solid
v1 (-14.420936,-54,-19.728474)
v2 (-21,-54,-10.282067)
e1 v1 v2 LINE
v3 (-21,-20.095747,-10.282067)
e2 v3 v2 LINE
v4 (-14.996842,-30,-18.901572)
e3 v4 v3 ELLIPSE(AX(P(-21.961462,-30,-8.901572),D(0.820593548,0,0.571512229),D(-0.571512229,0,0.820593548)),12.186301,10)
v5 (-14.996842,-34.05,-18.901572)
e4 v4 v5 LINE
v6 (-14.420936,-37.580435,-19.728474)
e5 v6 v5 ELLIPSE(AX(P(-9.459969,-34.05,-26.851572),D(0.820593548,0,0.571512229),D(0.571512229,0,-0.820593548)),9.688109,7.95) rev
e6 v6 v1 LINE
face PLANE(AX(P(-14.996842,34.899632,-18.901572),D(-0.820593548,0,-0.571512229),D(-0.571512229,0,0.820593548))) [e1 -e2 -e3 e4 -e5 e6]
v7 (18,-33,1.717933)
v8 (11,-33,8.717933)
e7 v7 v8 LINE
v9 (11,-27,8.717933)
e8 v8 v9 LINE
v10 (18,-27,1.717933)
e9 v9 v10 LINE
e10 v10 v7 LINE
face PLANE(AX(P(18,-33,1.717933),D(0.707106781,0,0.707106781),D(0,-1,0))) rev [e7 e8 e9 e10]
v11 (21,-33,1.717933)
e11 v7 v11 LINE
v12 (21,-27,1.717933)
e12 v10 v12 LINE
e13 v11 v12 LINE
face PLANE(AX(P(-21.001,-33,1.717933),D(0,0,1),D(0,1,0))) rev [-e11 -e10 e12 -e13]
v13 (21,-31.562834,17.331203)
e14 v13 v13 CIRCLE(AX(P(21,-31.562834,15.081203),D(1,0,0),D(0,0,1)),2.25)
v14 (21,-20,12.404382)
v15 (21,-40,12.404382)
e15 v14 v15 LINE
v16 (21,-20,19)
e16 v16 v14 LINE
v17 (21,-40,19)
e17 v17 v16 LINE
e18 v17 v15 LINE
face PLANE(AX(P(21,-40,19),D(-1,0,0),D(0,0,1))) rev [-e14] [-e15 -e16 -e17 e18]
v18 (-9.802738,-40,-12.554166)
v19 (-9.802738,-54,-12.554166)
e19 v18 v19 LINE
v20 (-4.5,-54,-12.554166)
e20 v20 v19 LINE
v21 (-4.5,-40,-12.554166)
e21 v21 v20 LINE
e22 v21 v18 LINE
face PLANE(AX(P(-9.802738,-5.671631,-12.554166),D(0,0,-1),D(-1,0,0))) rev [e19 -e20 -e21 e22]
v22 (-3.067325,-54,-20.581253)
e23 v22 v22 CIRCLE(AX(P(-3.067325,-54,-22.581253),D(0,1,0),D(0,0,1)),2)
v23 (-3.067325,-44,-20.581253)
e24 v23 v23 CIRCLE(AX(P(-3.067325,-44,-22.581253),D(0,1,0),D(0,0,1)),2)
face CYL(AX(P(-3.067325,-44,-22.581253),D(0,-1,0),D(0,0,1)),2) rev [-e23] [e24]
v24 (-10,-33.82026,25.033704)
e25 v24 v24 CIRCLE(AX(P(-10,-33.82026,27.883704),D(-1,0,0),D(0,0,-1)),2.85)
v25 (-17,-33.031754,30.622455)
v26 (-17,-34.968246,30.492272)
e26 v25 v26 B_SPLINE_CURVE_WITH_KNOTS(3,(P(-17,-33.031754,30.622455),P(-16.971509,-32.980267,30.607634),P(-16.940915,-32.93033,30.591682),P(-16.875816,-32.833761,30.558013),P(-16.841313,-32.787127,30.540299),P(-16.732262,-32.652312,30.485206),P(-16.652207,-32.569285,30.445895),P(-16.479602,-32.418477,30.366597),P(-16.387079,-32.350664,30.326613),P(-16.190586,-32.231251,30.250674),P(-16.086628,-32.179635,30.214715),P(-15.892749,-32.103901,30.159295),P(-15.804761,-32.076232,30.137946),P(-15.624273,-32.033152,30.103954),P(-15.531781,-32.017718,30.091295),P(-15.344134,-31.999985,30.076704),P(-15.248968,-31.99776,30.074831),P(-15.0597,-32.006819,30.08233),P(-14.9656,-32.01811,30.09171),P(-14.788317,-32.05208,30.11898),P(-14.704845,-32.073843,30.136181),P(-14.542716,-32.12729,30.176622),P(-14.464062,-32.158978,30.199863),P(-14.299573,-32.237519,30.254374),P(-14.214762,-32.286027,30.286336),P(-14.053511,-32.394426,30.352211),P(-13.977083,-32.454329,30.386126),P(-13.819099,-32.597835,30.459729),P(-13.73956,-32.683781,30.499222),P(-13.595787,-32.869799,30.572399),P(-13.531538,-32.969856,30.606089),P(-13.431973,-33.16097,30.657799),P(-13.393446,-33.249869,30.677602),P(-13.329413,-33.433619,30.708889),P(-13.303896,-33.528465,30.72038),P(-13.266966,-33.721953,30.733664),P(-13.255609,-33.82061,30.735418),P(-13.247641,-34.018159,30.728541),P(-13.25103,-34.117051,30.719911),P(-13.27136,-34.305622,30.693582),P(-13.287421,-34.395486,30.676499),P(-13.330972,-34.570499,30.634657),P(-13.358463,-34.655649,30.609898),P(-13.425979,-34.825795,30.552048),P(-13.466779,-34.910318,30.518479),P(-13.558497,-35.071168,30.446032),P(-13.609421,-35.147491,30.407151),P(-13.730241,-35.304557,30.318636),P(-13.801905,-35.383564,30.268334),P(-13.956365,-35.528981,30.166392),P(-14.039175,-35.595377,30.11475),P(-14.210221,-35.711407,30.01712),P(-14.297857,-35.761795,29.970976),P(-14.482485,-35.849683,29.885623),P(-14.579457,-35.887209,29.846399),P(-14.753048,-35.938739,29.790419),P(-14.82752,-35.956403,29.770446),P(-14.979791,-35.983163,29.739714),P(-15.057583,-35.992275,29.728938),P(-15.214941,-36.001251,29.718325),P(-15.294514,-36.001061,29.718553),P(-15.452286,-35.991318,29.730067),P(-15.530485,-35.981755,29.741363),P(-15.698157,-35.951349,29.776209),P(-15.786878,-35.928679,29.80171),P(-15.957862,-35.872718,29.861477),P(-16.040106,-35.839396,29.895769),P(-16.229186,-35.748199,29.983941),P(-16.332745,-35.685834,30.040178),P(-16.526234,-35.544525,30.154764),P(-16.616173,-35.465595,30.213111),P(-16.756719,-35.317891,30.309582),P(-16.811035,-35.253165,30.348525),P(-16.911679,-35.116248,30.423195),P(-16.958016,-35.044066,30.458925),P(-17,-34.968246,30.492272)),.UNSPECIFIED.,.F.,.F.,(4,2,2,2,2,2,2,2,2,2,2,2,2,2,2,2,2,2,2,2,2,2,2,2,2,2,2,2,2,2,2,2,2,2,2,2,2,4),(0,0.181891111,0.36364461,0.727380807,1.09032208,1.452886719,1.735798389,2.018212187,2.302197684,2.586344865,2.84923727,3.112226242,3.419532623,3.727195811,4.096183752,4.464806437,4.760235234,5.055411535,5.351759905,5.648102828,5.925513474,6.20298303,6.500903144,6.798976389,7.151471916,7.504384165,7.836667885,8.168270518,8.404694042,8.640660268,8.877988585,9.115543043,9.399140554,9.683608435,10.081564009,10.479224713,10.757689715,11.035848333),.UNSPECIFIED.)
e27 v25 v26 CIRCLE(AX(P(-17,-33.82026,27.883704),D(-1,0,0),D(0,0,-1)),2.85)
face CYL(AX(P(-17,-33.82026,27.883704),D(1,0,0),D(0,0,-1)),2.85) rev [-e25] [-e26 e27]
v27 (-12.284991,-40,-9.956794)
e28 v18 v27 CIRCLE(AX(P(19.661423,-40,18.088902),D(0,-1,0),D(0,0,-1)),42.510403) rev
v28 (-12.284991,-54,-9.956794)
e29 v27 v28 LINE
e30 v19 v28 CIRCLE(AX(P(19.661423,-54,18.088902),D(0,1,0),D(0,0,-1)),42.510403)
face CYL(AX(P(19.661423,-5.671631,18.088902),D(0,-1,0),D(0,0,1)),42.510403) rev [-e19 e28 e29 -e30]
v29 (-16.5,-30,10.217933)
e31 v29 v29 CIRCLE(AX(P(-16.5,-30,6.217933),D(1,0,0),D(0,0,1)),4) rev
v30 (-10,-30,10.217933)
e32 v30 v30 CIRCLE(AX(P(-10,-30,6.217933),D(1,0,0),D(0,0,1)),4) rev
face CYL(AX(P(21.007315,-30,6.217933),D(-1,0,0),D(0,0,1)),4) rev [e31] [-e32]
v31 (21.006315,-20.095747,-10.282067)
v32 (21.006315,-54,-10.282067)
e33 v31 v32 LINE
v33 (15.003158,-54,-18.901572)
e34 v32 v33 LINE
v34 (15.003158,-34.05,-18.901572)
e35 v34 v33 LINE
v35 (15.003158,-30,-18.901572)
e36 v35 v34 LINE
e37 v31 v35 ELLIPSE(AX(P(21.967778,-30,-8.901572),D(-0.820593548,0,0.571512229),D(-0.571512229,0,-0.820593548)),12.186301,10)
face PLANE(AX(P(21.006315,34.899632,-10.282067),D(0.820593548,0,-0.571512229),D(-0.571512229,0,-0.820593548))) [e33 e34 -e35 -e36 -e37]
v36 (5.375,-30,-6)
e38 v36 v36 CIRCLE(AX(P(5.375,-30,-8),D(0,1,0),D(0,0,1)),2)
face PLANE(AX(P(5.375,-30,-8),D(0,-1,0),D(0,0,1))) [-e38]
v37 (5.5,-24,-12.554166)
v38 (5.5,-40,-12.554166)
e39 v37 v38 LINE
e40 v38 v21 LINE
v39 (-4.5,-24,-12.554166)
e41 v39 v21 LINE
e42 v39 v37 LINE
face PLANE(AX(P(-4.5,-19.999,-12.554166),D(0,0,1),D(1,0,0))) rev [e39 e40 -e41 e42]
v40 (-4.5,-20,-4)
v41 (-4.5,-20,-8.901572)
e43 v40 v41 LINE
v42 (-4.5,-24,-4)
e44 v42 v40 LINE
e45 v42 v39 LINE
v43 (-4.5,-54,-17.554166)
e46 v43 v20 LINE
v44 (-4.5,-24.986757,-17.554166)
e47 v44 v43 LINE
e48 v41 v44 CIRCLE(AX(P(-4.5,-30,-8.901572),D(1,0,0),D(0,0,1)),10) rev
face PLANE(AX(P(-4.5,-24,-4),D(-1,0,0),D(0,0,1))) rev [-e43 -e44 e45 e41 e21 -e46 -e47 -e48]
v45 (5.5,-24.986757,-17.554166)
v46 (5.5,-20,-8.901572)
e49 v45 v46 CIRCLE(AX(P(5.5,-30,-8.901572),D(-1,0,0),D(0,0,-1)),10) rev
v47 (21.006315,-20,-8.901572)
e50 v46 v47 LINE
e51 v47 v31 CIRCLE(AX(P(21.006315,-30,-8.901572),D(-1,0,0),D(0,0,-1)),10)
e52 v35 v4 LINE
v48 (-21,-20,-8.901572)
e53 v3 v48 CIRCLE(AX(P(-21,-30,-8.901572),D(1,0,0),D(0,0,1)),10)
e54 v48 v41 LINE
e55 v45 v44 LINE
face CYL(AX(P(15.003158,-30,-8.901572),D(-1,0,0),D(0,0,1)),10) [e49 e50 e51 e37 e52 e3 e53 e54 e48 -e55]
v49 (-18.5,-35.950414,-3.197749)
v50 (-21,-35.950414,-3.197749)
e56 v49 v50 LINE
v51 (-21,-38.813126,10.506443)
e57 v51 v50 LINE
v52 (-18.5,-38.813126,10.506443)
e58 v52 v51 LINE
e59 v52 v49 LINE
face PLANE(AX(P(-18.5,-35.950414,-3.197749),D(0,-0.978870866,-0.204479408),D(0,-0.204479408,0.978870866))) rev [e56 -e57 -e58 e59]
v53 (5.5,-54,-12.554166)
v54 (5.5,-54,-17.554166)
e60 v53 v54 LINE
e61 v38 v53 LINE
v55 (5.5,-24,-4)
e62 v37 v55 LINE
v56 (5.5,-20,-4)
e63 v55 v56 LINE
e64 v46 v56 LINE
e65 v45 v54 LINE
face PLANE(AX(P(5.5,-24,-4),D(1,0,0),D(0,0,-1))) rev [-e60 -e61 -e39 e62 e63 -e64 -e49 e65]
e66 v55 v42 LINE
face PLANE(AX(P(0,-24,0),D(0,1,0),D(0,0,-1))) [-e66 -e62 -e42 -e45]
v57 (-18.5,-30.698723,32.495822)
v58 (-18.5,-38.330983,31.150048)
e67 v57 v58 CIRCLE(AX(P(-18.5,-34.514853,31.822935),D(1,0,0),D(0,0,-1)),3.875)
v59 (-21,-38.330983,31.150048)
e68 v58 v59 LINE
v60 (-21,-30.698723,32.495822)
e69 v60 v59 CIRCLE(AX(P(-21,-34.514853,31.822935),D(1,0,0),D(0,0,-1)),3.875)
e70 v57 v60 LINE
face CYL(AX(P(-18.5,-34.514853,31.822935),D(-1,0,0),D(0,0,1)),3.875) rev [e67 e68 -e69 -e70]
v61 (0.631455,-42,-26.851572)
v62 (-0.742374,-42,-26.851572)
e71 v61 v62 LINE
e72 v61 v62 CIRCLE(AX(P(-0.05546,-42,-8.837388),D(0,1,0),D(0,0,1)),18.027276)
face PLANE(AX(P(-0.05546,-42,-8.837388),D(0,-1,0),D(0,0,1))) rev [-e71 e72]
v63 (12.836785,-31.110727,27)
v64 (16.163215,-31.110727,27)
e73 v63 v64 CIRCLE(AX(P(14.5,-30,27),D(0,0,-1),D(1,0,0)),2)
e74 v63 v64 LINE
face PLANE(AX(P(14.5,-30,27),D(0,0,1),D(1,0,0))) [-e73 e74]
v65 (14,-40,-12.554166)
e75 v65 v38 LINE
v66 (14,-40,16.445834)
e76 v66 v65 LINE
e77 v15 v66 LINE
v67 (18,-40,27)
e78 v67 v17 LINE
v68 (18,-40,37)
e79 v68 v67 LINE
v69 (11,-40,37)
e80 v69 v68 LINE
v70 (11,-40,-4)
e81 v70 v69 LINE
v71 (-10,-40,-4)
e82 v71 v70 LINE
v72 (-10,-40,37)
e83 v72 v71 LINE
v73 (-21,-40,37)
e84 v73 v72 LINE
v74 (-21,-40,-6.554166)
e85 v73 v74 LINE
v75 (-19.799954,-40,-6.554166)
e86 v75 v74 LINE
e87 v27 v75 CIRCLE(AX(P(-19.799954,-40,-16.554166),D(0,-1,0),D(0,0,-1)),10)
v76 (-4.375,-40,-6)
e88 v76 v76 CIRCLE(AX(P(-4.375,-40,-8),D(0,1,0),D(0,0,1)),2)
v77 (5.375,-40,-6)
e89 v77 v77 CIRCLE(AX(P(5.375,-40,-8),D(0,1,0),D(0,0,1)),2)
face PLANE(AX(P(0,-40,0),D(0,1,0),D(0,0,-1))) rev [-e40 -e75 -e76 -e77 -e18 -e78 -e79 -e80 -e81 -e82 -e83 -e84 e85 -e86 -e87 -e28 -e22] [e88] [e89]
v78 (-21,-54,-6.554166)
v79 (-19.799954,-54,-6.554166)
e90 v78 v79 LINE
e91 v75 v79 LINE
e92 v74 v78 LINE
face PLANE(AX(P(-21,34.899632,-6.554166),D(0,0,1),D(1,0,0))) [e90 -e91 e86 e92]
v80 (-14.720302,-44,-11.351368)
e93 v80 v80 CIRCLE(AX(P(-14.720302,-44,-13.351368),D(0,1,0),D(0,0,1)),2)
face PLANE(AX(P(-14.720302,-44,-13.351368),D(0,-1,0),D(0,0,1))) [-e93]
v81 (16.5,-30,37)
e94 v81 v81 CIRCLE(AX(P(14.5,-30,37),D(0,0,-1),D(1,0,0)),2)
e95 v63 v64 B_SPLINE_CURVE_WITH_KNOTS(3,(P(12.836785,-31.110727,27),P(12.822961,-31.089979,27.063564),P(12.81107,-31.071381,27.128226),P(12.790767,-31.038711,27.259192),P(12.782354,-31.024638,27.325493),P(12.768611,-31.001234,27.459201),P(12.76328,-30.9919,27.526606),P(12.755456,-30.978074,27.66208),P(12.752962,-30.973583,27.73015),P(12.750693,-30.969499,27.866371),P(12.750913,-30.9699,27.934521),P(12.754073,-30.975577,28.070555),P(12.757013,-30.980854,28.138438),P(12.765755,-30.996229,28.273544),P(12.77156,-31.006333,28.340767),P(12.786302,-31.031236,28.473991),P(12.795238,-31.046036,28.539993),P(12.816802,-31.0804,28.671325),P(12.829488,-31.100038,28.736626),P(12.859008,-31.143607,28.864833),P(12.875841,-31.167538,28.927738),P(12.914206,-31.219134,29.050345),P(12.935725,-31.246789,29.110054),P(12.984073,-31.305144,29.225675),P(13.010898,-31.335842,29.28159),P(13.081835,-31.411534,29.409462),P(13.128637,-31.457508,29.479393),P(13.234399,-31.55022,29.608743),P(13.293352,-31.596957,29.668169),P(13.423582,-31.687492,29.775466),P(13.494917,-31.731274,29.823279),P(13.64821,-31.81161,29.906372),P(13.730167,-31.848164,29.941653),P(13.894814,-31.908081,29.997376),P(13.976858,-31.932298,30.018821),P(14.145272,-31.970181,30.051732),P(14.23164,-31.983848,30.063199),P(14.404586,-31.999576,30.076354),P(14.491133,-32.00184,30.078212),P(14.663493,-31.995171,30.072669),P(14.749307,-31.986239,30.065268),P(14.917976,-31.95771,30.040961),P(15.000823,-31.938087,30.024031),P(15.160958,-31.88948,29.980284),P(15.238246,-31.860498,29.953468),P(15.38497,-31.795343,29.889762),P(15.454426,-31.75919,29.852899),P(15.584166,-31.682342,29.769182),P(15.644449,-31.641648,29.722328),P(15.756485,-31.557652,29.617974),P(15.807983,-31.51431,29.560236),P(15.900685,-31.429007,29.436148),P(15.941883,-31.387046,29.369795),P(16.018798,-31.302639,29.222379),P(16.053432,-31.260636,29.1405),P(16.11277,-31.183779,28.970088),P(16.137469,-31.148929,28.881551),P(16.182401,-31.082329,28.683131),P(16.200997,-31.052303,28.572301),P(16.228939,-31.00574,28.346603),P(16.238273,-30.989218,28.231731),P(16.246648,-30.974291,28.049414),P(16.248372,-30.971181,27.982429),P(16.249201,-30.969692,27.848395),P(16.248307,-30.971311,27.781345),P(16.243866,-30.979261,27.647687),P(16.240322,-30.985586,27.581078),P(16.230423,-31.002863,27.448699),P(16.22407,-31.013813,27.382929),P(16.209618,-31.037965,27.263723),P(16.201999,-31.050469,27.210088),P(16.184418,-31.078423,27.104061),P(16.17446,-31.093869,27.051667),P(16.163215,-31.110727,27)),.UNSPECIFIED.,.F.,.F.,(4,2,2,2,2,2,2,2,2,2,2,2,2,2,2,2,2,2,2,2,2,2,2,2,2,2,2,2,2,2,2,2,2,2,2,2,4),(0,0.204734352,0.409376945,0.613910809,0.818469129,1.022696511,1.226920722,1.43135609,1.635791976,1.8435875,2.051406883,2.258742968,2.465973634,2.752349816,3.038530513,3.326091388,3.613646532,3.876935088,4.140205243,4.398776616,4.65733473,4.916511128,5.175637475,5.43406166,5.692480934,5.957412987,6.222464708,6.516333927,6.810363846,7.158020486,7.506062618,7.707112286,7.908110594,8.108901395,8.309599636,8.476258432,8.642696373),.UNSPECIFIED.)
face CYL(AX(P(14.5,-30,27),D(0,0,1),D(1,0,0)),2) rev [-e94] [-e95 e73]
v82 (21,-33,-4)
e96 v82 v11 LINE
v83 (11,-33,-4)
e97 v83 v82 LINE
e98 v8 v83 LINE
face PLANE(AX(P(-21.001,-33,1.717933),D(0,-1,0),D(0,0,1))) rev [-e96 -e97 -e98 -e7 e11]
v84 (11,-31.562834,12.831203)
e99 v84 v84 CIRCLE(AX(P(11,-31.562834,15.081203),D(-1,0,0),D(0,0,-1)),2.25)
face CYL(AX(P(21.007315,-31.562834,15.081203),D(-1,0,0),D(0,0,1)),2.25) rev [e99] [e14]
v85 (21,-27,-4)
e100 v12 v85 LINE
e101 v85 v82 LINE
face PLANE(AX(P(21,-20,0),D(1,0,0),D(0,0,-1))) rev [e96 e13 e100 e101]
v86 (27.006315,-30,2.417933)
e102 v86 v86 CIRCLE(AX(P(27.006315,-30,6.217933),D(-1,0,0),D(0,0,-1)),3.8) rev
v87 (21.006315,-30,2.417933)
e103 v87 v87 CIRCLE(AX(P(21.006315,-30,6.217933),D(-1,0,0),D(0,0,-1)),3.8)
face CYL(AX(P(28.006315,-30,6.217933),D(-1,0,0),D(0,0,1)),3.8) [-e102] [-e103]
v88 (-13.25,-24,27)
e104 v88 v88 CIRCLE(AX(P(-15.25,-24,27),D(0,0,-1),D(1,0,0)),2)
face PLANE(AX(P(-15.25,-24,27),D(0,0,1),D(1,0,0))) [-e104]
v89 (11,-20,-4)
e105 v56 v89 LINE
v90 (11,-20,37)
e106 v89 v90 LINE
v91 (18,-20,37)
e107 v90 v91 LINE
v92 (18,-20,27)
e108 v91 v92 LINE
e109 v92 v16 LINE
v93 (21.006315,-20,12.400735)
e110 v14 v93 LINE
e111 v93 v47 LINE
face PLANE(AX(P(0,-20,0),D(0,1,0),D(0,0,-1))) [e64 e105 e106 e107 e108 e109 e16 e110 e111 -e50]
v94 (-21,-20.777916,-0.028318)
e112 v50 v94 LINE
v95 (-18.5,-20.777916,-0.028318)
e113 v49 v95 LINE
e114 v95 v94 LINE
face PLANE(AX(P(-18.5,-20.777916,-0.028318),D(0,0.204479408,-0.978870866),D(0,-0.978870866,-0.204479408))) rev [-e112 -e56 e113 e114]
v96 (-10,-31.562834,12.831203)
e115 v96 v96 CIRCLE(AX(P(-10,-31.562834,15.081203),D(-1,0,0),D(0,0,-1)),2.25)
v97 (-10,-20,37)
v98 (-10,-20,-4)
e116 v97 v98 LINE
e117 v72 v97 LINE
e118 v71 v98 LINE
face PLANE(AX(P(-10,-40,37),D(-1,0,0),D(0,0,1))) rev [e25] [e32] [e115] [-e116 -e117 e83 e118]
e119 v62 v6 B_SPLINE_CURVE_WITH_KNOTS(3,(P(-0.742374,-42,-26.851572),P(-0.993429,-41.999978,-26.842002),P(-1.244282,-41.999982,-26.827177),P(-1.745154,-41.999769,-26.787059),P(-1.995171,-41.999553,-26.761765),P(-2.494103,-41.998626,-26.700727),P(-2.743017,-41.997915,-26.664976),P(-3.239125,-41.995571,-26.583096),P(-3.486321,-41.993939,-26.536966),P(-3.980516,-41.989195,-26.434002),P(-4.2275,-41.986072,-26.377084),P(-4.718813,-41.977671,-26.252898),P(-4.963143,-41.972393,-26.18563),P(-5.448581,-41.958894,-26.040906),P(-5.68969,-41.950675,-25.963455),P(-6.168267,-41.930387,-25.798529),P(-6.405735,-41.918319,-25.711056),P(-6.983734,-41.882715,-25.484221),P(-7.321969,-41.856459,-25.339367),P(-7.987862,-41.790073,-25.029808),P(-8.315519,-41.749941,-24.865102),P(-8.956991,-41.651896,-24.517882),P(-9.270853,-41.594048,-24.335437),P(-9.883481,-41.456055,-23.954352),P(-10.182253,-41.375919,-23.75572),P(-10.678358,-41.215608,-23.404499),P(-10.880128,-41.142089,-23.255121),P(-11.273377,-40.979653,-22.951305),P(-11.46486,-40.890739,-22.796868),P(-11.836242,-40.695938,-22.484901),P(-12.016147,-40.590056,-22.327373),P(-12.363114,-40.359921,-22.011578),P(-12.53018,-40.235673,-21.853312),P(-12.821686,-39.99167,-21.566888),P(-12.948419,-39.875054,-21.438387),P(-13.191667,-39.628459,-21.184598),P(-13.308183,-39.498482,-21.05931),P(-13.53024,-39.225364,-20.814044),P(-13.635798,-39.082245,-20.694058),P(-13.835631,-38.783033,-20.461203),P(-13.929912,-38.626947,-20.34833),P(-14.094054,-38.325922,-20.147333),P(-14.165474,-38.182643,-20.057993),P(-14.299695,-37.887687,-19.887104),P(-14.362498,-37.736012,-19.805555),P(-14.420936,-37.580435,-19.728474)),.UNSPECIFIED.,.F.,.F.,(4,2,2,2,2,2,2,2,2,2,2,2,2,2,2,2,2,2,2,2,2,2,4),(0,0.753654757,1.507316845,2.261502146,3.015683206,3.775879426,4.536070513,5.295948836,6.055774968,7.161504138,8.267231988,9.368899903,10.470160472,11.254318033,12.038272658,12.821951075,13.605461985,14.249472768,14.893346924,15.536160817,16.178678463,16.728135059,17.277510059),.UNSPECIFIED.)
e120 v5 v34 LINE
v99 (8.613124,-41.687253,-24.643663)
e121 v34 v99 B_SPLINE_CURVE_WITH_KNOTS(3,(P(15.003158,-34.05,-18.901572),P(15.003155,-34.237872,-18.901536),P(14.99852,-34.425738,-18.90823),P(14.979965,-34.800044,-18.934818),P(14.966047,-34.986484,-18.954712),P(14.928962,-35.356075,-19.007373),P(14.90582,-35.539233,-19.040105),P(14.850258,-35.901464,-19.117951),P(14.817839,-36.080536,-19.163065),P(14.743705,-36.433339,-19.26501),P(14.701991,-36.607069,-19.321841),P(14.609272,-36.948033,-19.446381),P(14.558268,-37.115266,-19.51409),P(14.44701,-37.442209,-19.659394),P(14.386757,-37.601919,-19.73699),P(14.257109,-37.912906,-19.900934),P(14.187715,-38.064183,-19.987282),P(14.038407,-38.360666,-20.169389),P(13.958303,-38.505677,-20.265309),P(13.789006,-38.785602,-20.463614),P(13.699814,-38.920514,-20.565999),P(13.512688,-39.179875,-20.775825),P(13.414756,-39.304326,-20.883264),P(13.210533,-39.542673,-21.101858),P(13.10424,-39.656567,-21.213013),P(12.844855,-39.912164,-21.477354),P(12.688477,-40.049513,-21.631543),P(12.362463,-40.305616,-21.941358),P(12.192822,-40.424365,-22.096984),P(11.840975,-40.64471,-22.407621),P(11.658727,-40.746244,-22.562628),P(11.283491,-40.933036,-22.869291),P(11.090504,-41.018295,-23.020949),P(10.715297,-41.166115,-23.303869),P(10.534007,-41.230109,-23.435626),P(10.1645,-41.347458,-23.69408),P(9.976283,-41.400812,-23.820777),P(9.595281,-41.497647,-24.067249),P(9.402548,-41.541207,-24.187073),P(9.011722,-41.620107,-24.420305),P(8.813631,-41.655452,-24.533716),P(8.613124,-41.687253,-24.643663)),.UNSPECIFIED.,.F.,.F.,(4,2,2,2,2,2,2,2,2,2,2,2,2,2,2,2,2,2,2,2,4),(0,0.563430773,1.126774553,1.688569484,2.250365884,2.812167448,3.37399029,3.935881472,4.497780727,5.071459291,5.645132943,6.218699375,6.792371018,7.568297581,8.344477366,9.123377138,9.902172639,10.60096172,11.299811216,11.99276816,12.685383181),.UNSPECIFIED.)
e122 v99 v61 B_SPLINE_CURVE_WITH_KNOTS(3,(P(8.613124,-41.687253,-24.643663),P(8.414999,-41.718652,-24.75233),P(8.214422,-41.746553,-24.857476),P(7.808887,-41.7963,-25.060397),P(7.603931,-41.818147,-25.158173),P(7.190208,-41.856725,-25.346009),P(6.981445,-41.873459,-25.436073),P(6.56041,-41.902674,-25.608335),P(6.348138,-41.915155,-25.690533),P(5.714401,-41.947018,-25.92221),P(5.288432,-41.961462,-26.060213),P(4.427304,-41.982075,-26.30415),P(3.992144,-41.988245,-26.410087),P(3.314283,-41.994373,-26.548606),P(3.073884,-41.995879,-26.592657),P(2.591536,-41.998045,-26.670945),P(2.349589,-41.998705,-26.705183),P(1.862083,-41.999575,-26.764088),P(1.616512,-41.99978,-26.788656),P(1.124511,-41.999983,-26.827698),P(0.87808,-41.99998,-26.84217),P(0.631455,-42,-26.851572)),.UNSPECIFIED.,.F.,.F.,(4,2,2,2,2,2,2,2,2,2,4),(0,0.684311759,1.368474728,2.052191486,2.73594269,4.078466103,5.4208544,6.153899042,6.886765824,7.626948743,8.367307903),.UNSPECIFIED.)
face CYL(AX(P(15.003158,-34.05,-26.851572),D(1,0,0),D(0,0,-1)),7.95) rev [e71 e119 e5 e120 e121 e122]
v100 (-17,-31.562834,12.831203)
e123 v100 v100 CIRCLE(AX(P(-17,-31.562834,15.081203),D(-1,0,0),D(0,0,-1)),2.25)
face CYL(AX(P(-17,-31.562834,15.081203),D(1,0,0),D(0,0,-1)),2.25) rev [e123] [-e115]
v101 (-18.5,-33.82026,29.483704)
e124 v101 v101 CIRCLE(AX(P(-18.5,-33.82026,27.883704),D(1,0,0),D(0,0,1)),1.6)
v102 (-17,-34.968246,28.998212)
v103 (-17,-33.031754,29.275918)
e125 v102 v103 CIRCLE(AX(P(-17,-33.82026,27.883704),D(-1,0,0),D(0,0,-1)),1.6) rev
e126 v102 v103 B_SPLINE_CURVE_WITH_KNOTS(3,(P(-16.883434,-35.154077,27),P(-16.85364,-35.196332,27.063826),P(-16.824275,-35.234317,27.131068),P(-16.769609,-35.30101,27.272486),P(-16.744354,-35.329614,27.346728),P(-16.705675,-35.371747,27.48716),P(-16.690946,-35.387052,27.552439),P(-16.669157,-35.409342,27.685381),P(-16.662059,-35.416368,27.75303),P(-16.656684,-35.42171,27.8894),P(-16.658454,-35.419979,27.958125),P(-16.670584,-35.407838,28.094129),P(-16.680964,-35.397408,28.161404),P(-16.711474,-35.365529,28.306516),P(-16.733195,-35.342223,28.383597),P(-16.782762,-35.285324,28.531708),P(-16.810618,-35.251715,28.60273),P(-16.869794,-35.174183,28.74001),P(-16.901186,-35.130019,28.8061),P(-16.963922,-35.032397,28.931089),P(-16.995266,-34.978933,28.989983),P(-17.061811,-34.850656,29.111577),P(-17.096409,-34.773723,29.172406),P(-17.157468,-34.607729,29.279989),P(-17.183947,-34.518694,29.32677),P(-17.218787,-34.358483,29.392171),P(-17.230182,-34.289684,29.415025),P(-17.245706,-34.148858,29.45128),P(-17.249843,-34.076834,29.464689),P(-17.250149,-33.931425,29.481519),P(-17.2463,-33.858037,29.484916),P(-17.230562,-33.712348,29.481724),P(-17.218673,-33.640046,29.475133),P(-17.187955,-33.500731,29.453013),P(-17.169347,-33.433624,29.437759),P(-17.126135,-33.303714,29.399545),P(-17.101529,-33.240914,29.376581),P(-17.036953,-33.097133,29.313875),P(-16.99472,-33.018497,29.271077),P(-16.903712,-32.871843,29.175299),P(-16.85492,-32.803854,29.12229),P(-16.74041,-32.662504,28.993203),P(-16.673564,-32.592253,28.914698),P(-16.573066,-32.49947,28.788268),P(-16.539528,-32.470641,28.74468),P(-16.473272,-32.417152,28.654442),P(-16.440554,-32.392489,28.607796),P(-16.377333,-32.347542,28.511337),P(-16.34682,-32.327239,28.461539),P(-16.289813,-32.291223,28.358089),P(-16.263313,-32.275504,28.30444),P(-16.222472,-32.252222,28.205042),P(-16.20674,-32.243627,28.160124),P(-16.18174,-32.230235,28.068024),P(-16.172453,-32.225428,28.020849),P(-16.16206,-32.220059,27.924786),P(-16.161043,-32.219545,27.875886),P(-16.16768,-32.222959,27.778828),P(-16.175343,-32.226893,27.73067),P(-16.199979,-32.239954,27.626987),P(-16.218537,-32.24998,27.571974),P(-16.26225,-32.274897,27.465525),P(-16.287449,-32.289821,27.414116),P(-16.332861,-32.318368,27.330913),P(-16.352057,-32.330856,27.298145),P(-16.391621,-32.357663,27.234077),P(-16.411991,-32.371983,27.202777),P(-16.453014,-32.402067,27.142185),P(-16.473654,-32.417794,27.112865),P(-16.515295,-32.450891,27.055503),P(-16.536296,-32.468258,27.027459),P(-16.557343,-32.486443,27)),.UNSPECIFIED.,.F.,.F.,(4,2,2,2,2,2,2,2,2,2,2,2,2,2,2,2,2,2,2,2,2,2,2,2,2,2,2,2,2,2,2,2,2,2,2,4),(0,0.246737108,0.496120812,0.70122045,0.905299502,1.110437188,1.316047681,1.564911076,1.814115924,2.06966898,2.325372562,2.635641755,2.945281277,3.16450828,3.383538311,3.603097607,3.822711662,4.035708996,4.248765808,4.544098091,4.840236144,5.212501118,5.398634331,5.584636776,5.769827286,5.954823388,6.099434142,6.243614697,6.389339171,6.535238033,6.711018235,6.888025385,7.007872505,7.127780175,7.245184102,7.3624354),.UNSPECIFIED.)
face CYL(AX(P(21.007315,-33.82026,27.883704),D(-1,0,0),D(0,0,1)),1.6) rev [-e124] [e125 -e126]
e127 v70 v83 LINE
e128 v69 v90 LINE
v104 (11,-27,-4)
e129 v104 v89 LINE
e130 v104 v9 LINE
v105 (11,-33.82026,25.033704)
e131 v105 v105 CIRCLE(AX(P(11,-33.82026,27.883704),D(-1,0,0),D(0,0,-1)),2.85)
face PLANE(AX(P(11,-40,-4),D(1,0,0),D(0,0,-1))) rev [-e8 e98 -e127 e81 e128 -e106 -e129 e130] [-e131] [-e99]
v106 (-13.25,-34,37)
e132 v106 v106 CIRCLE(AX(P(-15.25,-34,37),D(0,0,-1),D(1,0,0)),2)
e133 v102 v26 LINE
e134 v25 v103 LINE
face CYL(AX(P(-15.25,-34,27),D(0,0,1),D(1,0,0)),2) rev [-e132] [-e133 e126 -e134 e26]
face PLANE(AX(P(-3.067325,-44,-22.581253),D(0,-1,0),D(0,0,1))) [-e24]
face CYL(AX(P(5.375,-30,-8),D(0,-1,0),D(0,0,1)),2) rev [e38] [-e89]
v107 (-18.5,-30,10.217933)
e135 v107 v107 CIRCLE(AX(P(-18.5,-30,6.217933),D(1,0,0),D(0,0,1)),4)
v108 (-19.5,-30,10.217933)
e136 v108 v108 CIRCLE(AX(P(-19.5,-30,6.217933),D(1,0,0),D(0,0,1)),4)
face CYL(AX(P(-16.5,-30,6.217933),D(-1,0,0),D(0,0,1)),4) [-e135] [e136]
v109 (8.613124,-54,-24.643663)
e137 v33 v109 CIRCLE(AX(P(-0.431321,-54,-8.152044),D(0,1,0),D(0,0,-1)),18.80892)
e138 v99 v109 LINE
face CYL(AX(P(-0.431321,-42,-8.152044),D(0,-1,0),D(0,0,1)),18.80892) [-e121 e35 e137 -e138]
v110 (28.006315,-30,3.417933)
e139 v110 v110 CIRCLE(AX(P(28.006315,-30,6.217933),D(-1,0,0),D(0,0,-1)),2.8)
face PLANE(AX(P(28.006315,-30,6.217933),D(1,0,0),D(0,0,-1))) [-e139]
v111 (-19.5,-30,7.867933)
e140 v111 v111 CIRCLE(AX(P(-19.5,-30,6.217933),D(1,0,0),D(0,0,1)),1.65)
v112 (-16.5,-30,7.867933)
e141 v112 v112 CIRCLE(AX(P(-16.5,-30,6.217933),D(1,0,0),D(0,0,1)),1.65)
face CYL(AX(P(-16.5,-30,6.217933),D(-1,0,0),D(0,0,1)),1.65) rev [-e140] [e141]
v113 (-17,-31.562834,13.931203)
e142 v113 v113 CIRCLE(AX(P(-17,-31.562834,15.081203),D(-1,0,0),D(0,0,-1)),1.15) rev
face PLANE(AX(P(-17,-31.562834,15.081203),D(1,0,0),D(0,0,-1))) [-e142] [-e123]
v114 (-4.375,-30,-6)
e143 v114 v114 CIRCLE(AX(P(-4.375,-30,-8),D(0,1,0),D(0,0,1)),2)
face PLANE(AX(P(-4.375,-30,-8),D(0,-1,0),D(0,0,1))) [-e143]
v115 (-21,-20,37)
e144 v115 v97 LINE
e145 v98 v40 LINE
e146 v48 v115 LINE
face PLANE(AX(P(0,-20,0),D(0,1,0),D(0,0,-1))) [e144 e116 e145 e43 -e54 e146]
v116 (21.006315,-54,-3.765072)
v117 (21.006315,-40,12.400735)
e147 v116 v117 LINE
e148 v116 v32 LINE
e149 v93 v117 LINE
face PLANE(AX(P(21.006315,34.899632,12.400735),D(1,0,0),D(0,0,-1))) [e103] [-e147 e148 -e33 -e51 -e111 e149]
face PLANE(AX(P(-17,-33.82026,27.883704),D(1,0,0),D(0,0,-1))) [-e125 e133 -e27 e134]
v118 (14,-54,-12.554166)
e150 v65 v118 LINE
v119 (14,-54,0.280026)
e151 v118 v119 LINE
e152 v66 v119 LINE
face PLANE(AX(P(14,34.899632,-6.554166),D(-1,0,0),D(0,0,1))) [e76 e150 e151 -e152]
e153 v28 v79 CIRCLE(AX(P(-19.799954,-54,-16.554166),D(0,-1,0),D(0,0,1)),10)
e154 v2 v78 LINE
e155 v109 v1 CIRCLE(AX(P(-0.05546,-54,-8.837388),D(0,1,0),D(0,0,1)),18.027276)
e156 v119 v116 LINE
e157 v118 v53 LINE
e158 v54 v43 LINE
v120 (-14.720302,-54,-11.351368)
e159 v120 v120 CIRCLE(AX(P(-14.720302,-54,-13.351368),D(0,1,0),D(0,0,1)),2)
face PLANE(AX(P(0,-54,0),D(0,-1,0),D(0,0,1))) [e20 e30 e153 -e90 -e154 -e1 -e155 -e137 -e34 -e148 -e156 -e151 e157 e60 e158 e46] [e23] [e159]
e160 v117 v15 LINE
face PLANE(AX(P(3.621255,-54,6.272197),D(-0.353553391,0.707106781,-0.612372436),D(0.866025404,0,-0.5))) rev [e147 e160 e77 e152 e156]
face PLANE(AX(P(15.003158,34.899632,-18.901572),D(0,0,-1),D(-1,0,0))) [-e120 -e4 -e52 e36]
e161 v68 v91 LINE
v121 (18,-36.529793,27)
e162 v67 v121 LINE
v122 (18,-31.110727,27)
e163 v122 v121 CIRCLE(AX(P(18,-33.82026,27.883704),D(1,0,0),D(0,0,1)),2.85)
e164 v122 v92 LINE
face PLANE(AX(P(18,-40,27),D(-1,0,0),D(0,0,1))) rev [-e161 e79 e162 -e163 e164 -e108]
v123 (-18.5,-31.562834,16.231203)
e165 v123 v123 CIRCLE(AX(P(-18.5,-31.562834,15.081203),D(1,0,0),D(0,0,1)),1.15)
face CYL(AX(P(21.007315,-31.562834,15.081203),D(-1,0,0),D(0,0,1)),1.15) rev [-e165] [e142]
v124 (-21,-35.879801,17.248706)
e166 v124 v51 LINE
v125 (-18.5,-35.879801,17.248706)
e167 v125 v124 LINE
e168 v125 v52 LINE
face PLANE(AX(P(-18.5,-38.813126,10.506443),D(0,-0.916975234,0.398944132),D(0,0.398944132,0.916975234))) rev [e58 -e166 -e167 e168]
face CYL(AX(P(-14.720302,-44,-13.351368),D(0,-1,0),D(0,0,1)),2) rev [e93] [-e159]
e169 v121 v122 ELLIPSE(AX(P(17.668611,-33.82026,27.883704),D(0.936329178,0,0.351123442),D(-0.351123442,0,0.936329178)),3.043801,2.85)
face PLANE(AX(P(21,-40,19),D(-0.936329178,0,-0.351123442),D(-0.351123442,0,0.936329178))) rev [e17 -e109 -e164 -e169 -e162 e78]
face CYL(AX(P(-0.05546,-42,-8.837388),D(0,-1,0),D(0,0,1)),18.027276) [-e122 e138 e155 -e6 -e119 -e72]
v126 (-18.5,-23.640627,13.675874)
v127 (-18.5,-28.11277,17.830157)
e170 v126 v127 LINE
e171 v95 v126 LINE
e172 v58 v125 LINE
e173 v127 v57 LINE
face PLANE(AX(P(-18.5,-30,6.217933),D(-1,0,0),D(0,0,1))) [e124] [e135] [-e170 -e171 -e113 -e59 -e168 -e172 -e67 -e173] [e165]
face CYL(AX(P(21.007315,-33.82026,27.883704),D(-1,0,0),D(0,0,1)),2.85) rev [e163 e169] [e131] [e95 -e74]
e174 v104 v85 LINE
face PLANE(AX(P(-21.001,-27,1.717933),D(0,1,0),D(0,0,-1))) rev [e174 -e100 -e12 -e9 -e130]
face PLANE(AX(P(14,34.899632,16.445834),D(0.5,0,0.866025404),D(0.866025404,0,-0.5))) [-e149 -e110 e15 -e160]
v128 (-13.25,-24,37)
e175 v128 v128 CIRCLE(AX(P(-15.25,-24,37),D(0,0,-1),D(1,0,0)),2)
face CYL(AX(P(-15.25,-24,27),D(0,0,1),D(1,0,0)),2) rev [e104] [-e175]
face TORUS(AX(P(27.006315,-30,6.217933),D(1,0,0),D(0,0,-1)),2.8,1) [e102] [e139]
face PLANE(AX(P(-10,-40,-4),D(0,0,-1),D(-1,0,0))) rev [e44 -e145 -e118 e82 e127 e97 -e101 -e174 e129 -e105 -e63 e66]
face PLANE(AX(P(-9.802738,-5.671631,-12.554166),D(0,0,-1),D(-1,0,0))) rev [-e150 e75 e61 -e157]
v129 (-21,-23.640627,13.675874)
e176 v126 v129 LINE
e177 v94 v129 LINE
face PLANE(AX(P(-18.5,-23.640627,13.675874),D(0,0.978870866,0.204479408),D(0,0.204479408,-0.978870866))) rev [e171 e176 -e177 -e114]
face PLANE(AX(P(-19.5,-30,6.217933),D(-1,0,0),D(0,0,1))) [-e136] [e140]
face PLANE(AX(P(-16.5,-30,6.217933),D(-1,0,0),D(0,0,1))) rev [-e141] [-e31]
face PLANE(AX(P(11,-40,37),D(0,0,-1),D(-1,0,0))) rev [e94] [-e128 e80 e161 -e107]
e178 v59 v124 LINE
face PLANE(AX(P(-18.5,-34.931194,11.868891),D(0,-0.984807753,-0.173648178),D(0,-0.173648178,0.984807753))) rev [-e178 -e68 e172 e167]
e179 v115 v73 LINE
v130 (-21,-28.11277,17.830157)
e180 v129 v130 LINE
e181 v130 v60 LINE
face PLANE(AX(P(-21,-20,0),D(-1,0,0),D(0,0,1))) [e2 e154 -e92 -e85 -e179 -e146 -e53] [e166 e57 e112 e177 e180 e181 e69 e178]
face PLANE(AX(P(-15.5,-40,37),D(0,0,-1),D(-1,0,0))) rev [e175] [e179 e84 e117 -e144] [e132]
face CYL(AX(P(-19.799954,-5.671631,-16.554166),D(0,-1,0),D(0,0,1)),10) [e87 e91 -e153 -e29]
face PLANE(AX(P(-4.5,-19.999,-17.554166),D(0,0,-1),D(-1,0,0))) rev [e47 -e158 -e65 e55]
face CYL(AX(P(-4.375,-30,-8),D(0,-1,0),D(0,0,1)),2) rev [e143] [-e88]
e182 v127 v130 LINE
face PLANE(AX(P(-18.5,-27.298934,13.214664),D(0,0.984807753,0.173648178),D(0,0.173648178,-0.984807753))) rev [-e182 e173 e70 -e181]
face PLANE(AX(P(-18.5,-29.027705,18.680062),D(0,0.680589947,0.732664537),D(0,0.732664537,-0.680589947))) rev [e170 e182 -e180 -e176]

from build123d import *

# Parameters (mm, degrees)
BOSS_EXTRUDE1_DEPTH             = 20
SKETCH6_W                       = 25
SKETCH6_H                       = 20
BOSS_EXTRUDE5_DEPTH             = 5.5
BOSS_EXTRUDE11_START            = -20
BOSS_EXTRUDE11_DEPTH            = 34
SKETCH4_R                       = 2
CUT_EXTRUDE1_DEPTH              = 10
BOSS_EXTRUDE13_DEPTH            = 12
FILLET11_START                  = 14.0499999
FILLET11_DEPTH                  = 7.9500001
FILLET11_START_2                = -14.996842371
FILLET11_2_DEPTH                = 30.996842371
SKETCH22_R                      = 2
CUT_EXTRUDE6_DEPTH              = 10
CHAMFER1_SIZE                   = 14
SKETCH26_W                      = 22
SKETCH26_H                      = 20
BOSS_EXTRUDE14_DEPTH            = 11
CUT_EXTRUDE7_DEPTH              = 2.5
CUT_EXTRUDE8_REACH              = 65.92
SKETCH27_R                      = 4
SKETCH27_R_2                    = 1.15
SKETCH27_R_3                    = 1.6
CUT_EXTRUDE9_DEPTH              = 2.5
BOSS_EXTRUDE15_DEPTH            = 1
BOSS_EXTRUDE15_DEPTH_BACK       = 2
SKETCH31_R                      = 4
SKETCH31_R_2                    = 1.65
SKETCH32_R                      = 2.85
SKETCH32_R_2                    = 2.25
CUT_EXTRUDE12_DEPTH             = 7
CUT_EXTRUDE12_DIRECTION_2_REACH = 61.046
SKETCH33_R                      = 3.8
BOSS_EXTRUDE17_DEPTH            = 7
FILLET17_R                      = 1
CUT_EXTRUDE13_DEPTH             = 14
SKETCH36_R                      = 2
CUT_EXTRUDE14_DEPTH             = 10
FILLET18_R                      = 10
CUT_EXTRUDE16_REACH             = 67.49
SKETCH37_W                      = 5.717933373
SKETCH37_H                      = 6
CHAMFER2_SIZE                   = 7
SKETCH38_W                      = 10
SKETCH38_H                      = 20
CUT_EXTRUDE17_DEPTH             = 4
CUT_EXTRUDE19_REACH             = 59.527
SKETCH39_W                      = 10
SKETCH39_H                      = 5
CUT_EXTRUDE20_DEPTH             = 83.61561247
CUT_EXTRUDE20_DEPTH_BACK        = 83.61561247
SKETCH40_W                      = 71.015717368
SKETCH40_H                      = 42.367018064


with BuildPart() as part:
    # Sketch1 → Boss-Extrude1 (new body)
    with BuildSketch(Plane(origin=(0, 0, 0), x_dir=(1, 0, 0), z_dir=(0, 1, 0))):
        Polygon((-15.5, -37), (-10, -37), (-10, 4), (11, 4), (11, -37), (18, -37), (18, -27), (21, -19), (21, 10), (-15.5, 10), align=None)
    extrude(amount=BOSS_EXTRUDE1_DEPTH)

    # Sketch6 → Boss-Extrude5 (add)
    with BuildSketch(Plane.ZY.offset(15.5)):
        with Locations((2.5, 10)):
            Rectangle(SKETCH6_W, SKETCH6_H)
    extrude(amount=BOSS_EXTRUDE5_DEPTH)

    # Sketch20 → Boss-Extrude11 (add)
    with BuildSketch(Plane(origin=(0, 20, 0), x_dir=(1, 0, 0), z_dir=(0, 1, 0)).offset(BOSS_EXTRUDE11_START)):
        Polygon((-21, 6.554166441), (14, 6.554166441), (14, -16.445833559), (21.006315459, -12.400735443), (21.006315459, 10.282066627), (15.003157729, 18.901571597), (-14.996842271, 18.901571597), (-21, 10.282066627), align=None)
    extrude(amount=BOSS_EXTRUDE11_DEPTH)

    # Sketch4 → Cut-Extrude1 (cut)
    with BuildSketch(Plane(origin=(0, 20, 0), x_dir=(1, 0, 0), z_dir=(0, 1, 0))):
        with Locations(Location((-4.375, 8, 0), (0, 0, 270))):
            Circle(SKETCH4_R)
        with Locations(Location((5.375, 8, 0), (0, 0, 270))):
            Circle(SKETCH4_R)
    extrude(amount=-CUT_EXTRUDE1_DEPTH, mode=Mode.SUBTRACT)

    # Sketch24 → Boss-Extrude13 (add)
    with BuildSketch(Plane(origin=(0, 34, 0), x_dir=(1, 0, 0), z_dir=(0, 1, 0))):
        with BuildLine():
            Line((-14.996842271, 18.901571597), (-14.420936492, 19.728473528))
            ThreePointArc((-14.420936492, 19.728473528), (-3.81756267, 26.467738085), (8.613124034, 24.643662635))
            ThreePointArc((8.613124034, 24.643662635), (12.140366622, 22.142331504), (15.003157729, 18.901571597))
            Line((15.003157729, 18.901571597), (21.006315459, 10.282066627))
            Line((21.006315459, 10.282066627), (21.006315459, 6.554166441))
            Line((21.006315459, 6.554166441), (-21, 6.554166441))
            Line((-21, 6.554166441), (-21, 10.282066627))
            Line((-21, 10.282066627), (-14.996842271, 18.901571597))
        make_face()
    extrude(amount=-BOSS_EXTRUDE13_DEPTH)

    # Fillet11: read off the stored shape, not the designer's step
    # Fillet11 outline → Fillet11 (add)
    with BuildSketch(Plane(origin=(0, 0, 0), x_dir=(1, 0, 0), z_dir=(0, 1, 0)).offset(FILLET11_START)):
        with BuildLine():
            Line((-14.996842271, 18.901571597), (15.003161757, 18.901565813))
            ThreePointArc((15.003161757, 18.901565813), (12.140369243, 22.142329149), (8.613124034, 24.643662635))
            ThreePointArc((8.613124034, 24.643662635), (-3.81756267, 26.467738085), (-14.420936492, 19.728473528))
            Line((-14.420936492, 19.728473528), (-14.996842271, 18.901571597))
        make_face()
    extrude(amount=FILLET11_DEPTH)

    # Fillet11 2 outline → Fillet11 2 (cut)
    with BuildSketch(Plane.YZ.offset(FILLET11_START_2)):
        with BuildLine():
            Line((22, -28), (22, -26.851571597))
            ThreePointArc((22, -26.851571597), (19.67149891, -21.230072687), (14.05, -18.901571597))
            Line((14.05, -18.901571597), (14.0499999, -28))
            Line((14.0499999, -28), (22, -28))
        make_face()
    extrude(amount=FILLET11_2_DEPTH, mode=Mode.SUBTRACT)

    # Sketch22 → Cut-Extrude6 (cut)
    with BuildSketch(Plane(origin=(0, 34, 0), x_dir=(1, 0, 0), z_dir=(0, 1, 0))):
        with Locations(Location((-14.720302421, 13.351367671, 0), (0, 0, 270))):
            Circle(SKETCH22_R)
        with Locations(Location((-3.067324575, 22.581252689, 0), (0, 0, 270))):
            Circle(SKETCH22_R)
    extrude(amount=-CUT_EXTRUDE6_DEPTH, mode=Mode.SUBTRACT)

    # Chamfer1
    chamfer1_edges = [part.edges().sort_by_distance(p)[0] for p in [
        (17.503157729, 34, 14.423284501),
    ]]
    chamfer(chamfer1_edges, length=CHAMFER1_SIZE)

    # Sketch26 → Boss-Extrude14 (add)
    with BuildSketch(Plane.ZY.offset(21)):
        with Locations((26, 10)):
            Rectangle(SKETCH26_W, SKETCH26_H)
    extrude(amount=-BOSS_EXTRUDE14_DEPTH)

    # Sketch25 → Cut-Extrude7 (cut)
    with BuildSketch(Plane.ZY.offset(21)):
        with BuildLine():
            Line((11.868890963, 14.931194411), (31.150048263, 18.330982662))
            ThreePointArc((31.150048263, 18.330982662), (35.639064994, 15.187739308), (32.49582164, 10.698722576))
            Line((32.49582164, 10.698722576), (13.21466434, 7.298934325))
            ThreePointArc((13.21466434, 7.298934325), (-1.168124774, 8.697638667), (11.868890963, 14.931194411))
        make_face()
    extrude(amount=-CUT_EXTRUDE7_DEPTH, mode=Mode.SUBTRACT)

    # Sketch27 → Cut-Extrude8 (cut, up to next)
    with BuildSketch(Plane.ZY.offset(18.5), mode=Mode.PRIVATE) as cut_extrude8_sk1:
        with Locations((6.217933373, 10)):
            Circle(SKETCH27_R)
    cut_extrude8_tool1 = extrude(cut_extrude8_sk1.sketch, amount=-CUT_EXTRUDE8_REACH, mode=Mode.PRIVATE) & part.part
    # Sketch27 → Cut-Extrude8 (cut, up to next)
    with BuildSketch(Plane.ZY.offset(18.5), mode=Mode.PRIVATE) as cut_extrude8_sk2:
        with Locations((15.08120315, 11.562833599)):
            Circle(SKETCH27_R_2)
    cut_extrude8_tool2 = extrude(cut_extrude8_sk2.sketch, amount=-CUT_EXTRUDE8_REACH, mode=Mode.PRIVATE) & part.part
    # Sketch27 → Cut-Extrude8 (cut, up to next)
    with BuildSketch(Plane.ZY.offset(18.5), mode=Mode.PRIVATE) as cut_extrude8_sk3:
        with Locations((27.883703939, 13.820259909)):
            Circle(SKETCH27_R_3)
    cut_extrude8_tool3 = extrude(cut_extrude8_sk3.sketch, amount=-CUT_EXTRUDE8_REACH, mode=Mode.PRIVATE) & part.part
    add(cut_extrude8_tool1.solids().sort_by_distance((-18.5, 10, 6.217933))[0], mode=Mode.SUBTRACT)
    add(cut_extrude8_tool2.solids().sort_by_distance((-18.5, 11.562834, 15.081203))[0], mode=Mode.SUBTRACT)
    add(cut_extrude8_tool3.solids().sort_by_distance((-18.5, 13.82026, 27.883704))[0], mode=Mode.SUBTRACT)

    # Sketch28 → Cut-Extrude9 (cut)
    with BuildSketch(Plane.ZY.offset(21)):
        Polygon((-0.028318142, 0.777915528), (-3.197748963, 15.950413947), (10.506443157, 18.813125656), (17.248705835, 15.879800924), (18.680061689, 9.027704864), (13.675873978, 3.640627238), align=None)
    extrude(amount=-CUT_EXTRUDE9_DEPTH, mode=Mode.SUBTRACT)

    # Sketch31 → Boss-Extrude15 (add, two sides: drawn at the far end of the back side and taken through both)
    with BuildSketch(Plane.ZY.offset(18.5).offset(-BOSS_EXTRUDE15_DEPTH_BACK)):
        with Locations((6.217933373, 10)):
            Circle(SKETCH31_R)
        with Locations((6.217933373, 10)):
            Circle(SKETCH31_R_2, mode=Mode.SUBTRACT)
    extrude(amount=BOSS_EXTRUDE15_DEPTH + BOSS_EXTRUDE15_DEPTH_BACK)

    # Sketch32 → Cut-Extrude12 (cut)
    with BuildSketch(Plane(origin=(-10, 0, 0), x_dir=(0, 0, -1), z_dir=(1, 0, 0))):
        with Locations((-27.883703939, 13.820259909)):
            Circle(SKETCH32_R)
        with Locations((-15.08120315, 11.562833599)):
            Circle(SKETCH32_R_2)
    extrude(amount=-CUT_EXTRUDE12_DEPTH, mode=Mode.SUBTRACT)

    # Sketch32 → Cut-Extrude12 direction 2 (cut, up to next)
    with BuildSketch(Plane(origin=(-10, 0, 0), x_dir=(0, 0, -1), z_dir=(1, 0, 0)), mode=Mode.PRIVATE) as cut_extrude12_direction_2_sk1:
        with Locations((-27.883703939, 13.820259909)):
            Circle(SKETCH32_R)
    cut_extrude12_direction_2_tool1 = extrude(cut_extrude12_direction_2_sk1.sketch, amount=CUT_EXTRUDE12_DIRECTION_2_REACH, mode=Mode.PRIVATE) & part.part
    # Sketch32 → Cut-Extrude12 direction 2 (cut, up to next)
    with BuildSketch(Plane(origin=(-10, 0, 0), x_dir=(0, 0, -1), z_dir=(1, 0, 0)), mode=Mode.PRIVATE) as cut_extrude12_direction_2_sk2:
        with Locations((-15.08120315, 11.562833599)):
            Circle(SKETCH32_R_2)
    cut_extrude12_direction_2_tool2 = extrude(cut_extrude12_direction_2_sk2.sketch, amount=CUT_EXTRUDE12_DIRECTION_2_REACH, mode=Mode.PRIVATE) & part.part
    add(cut_extrude12_direction_2_tool1.solids().sort_by_distance((-10, 13.82026, 27.883704))[0], mode=Mode.SUBTRACT)
    add(cut_extrude12_direction_2_tool2.solids().sort_by_distance((-10, 11.562834, 15.081203))[0], mode=Mode.SUBTRACT)

    # Sketch33 → Boss-Extrude17 (add)
    with BuildSketch(Plane(origin=(21.006315459, 0, 0), x_dir=(0, 0, -1), z_dir=(1, 0, 0))):
        with Locations((-6.217933373, 10)):
            Circle(SKETCH33_R)
    extrude(amount=BOSS_EXTRUDE17_DEPTH)

    # Fillet17
    fillet17_edges = [part.edges().sort_by_distance(p)[0] for p in [
        (28.006315459, 10, 10.017933373),
    ]]
    fillet(fillet17_edges, radius=FILLET17_R)

    # Sketch35 → Cut-Extrude13 (cut)
    with BuildSketch(Plane(origin=(0, 34, 0), x_dir=(1, 0, 0), z_dir=(0, 1, 0))):
        with BuildLine():
            Line((-19.79995418, 6.554166441), (14, 6.554166441))
            Line((14, 6.554166441), (14, 12.554166441))
            Line((14, 12.554166441), (-9.802737675, 12.554166441))
            ThreePointArc((-9.802737675, 12.554166441), (-11.071315957, 11.28171537), (-12.284990593, 9.956794065))
            ThreePointArc((-12.284990593, 9.956794065), (-15.675255632, 7.444453939), (-19.79995418, 6.554166441))
        make_face()
    extrude(amount=-CUT_EXTRUDE13_DEPTH, mode=Mode.SUBTRACT)

    # Sketch36 → Cut-Extrude14 (cut)
    with BuildSketch(Plane.XY.offset(37)):
        with Locations((-15.25, 14)):
            Circle(SKETCH36_R)
        with Locations((14.5, 10)):
            Circle(SKETCH36_R)
        with Locations((-15.25, 4)):
            Circle(SKETCH36_R)
    extrude(amount=-CUT_EXTRUDE14_DEPTH, mode=Mode.SUBTRACT)

    # Fillet18
    fillet18_edges = [part.edges().sort_by_distance(p)[0] for p in [
        (0.003157729, 0, -18.901571597),
    ]]
    fillet(fillet18_edges, radius=FILLET18_R)

    # Sketch37 → Cut-Extrude16 (cut, up to next)
    with BuildSketch(Plane(origin=(21, 0, 0), x_dir=(0, 0, -1), z_dir=(1, 0, 0)), mode=Mode.PRIVATE) as cut_extrude16_sk1:
        with Locations((1.141033313, 10)):
            Rectangle(SKETCH37_W, SKETCH37_H)
    cut_extrude16_tool1 = extrude(cut_extrude16_sk1.sketch, amount=-CUT_EXTRUDE16_REACH, mode=Mode.PRIVATE) & part.part
    add(cut_extrude16_tool1.solids().sort_by_distance((21, 10, -1.141033))[0], mode=Mode.SUBTRACT)

    # Chamfer2
    chamfer2_edges = [part.edges().sort_by_distance(p)[0] for p in [
        (11, 10, 1.717933373),
    ]]
    chamfer(chamfer2_edges, length=CHAMFER2_SIZE)

    # Sketch38 → Cut-Extrude17 (cut)
    with BuildSketch(Plane.XZ):
        with Locations((0.5, -14)):
            Rectangle(SKETCH38_W, SKETCH38_H)
    extrude(amount=-CUT_EXTRUDE17_DEPTH, mode=Mode.SUBTRACT)

    # Sketch39 → Cut-Extrude19 (cut, up to next)
    with BuildSketch(Plane(origin=(0, 34, 0), x_dir=(1, 0, 0), z_dir=(0, 1, 0)), mode=Mode.PRIVATE) as cut_extrude19_sk1:
        with Locations((0.5, 15.054166441)):
            Rectangle(SKETCH39_W, SKETCH39_H)
    cut_extrude19_tool1 = extrude(cut_extrude19_sk1.sketch, amount=-CUT_EXTRUDE19_REACH, mode=Mode.PRIVATE) & part.part
    add(cut_extrude19_tool1.solids().sort_by_distance((0.5, 34, -15.054166))[0], mode=Mode.SUBTRACT)


with BuildPart() as body_2:
    # Mirror1: mirrored copy
    add(part.part.mirror(Plane(origin=(0, -10, 0), x_dir=(0, 0, 1), z_dir=(0, -1, 0))))


with BuildPart() as part_1:
    add(part.part)

    # Sketch40 → Cut-Extrude20 (cut, two sides: drawn at the far end of the back side and taken through both)
    with BuildSketch(Plane(origin=(0, 0, -18.901571597), x_dir=(-1, 0, 0), z_dir=(0, 0, -1)).offset(-CUT_EXTRUDE20_DEPTH_BACK)):
        with Locations((-4.991813068, 18.312991293)):
            Rectangle(SKETCH40_W, SKETCH40_H)
    extrude(amount=CUT_EXTRUDE20_DEPTH + CUT_EXTRUDE20_DEPTH_BACK, mode=Mode.SUBTRACT)


solid = body_2.part
